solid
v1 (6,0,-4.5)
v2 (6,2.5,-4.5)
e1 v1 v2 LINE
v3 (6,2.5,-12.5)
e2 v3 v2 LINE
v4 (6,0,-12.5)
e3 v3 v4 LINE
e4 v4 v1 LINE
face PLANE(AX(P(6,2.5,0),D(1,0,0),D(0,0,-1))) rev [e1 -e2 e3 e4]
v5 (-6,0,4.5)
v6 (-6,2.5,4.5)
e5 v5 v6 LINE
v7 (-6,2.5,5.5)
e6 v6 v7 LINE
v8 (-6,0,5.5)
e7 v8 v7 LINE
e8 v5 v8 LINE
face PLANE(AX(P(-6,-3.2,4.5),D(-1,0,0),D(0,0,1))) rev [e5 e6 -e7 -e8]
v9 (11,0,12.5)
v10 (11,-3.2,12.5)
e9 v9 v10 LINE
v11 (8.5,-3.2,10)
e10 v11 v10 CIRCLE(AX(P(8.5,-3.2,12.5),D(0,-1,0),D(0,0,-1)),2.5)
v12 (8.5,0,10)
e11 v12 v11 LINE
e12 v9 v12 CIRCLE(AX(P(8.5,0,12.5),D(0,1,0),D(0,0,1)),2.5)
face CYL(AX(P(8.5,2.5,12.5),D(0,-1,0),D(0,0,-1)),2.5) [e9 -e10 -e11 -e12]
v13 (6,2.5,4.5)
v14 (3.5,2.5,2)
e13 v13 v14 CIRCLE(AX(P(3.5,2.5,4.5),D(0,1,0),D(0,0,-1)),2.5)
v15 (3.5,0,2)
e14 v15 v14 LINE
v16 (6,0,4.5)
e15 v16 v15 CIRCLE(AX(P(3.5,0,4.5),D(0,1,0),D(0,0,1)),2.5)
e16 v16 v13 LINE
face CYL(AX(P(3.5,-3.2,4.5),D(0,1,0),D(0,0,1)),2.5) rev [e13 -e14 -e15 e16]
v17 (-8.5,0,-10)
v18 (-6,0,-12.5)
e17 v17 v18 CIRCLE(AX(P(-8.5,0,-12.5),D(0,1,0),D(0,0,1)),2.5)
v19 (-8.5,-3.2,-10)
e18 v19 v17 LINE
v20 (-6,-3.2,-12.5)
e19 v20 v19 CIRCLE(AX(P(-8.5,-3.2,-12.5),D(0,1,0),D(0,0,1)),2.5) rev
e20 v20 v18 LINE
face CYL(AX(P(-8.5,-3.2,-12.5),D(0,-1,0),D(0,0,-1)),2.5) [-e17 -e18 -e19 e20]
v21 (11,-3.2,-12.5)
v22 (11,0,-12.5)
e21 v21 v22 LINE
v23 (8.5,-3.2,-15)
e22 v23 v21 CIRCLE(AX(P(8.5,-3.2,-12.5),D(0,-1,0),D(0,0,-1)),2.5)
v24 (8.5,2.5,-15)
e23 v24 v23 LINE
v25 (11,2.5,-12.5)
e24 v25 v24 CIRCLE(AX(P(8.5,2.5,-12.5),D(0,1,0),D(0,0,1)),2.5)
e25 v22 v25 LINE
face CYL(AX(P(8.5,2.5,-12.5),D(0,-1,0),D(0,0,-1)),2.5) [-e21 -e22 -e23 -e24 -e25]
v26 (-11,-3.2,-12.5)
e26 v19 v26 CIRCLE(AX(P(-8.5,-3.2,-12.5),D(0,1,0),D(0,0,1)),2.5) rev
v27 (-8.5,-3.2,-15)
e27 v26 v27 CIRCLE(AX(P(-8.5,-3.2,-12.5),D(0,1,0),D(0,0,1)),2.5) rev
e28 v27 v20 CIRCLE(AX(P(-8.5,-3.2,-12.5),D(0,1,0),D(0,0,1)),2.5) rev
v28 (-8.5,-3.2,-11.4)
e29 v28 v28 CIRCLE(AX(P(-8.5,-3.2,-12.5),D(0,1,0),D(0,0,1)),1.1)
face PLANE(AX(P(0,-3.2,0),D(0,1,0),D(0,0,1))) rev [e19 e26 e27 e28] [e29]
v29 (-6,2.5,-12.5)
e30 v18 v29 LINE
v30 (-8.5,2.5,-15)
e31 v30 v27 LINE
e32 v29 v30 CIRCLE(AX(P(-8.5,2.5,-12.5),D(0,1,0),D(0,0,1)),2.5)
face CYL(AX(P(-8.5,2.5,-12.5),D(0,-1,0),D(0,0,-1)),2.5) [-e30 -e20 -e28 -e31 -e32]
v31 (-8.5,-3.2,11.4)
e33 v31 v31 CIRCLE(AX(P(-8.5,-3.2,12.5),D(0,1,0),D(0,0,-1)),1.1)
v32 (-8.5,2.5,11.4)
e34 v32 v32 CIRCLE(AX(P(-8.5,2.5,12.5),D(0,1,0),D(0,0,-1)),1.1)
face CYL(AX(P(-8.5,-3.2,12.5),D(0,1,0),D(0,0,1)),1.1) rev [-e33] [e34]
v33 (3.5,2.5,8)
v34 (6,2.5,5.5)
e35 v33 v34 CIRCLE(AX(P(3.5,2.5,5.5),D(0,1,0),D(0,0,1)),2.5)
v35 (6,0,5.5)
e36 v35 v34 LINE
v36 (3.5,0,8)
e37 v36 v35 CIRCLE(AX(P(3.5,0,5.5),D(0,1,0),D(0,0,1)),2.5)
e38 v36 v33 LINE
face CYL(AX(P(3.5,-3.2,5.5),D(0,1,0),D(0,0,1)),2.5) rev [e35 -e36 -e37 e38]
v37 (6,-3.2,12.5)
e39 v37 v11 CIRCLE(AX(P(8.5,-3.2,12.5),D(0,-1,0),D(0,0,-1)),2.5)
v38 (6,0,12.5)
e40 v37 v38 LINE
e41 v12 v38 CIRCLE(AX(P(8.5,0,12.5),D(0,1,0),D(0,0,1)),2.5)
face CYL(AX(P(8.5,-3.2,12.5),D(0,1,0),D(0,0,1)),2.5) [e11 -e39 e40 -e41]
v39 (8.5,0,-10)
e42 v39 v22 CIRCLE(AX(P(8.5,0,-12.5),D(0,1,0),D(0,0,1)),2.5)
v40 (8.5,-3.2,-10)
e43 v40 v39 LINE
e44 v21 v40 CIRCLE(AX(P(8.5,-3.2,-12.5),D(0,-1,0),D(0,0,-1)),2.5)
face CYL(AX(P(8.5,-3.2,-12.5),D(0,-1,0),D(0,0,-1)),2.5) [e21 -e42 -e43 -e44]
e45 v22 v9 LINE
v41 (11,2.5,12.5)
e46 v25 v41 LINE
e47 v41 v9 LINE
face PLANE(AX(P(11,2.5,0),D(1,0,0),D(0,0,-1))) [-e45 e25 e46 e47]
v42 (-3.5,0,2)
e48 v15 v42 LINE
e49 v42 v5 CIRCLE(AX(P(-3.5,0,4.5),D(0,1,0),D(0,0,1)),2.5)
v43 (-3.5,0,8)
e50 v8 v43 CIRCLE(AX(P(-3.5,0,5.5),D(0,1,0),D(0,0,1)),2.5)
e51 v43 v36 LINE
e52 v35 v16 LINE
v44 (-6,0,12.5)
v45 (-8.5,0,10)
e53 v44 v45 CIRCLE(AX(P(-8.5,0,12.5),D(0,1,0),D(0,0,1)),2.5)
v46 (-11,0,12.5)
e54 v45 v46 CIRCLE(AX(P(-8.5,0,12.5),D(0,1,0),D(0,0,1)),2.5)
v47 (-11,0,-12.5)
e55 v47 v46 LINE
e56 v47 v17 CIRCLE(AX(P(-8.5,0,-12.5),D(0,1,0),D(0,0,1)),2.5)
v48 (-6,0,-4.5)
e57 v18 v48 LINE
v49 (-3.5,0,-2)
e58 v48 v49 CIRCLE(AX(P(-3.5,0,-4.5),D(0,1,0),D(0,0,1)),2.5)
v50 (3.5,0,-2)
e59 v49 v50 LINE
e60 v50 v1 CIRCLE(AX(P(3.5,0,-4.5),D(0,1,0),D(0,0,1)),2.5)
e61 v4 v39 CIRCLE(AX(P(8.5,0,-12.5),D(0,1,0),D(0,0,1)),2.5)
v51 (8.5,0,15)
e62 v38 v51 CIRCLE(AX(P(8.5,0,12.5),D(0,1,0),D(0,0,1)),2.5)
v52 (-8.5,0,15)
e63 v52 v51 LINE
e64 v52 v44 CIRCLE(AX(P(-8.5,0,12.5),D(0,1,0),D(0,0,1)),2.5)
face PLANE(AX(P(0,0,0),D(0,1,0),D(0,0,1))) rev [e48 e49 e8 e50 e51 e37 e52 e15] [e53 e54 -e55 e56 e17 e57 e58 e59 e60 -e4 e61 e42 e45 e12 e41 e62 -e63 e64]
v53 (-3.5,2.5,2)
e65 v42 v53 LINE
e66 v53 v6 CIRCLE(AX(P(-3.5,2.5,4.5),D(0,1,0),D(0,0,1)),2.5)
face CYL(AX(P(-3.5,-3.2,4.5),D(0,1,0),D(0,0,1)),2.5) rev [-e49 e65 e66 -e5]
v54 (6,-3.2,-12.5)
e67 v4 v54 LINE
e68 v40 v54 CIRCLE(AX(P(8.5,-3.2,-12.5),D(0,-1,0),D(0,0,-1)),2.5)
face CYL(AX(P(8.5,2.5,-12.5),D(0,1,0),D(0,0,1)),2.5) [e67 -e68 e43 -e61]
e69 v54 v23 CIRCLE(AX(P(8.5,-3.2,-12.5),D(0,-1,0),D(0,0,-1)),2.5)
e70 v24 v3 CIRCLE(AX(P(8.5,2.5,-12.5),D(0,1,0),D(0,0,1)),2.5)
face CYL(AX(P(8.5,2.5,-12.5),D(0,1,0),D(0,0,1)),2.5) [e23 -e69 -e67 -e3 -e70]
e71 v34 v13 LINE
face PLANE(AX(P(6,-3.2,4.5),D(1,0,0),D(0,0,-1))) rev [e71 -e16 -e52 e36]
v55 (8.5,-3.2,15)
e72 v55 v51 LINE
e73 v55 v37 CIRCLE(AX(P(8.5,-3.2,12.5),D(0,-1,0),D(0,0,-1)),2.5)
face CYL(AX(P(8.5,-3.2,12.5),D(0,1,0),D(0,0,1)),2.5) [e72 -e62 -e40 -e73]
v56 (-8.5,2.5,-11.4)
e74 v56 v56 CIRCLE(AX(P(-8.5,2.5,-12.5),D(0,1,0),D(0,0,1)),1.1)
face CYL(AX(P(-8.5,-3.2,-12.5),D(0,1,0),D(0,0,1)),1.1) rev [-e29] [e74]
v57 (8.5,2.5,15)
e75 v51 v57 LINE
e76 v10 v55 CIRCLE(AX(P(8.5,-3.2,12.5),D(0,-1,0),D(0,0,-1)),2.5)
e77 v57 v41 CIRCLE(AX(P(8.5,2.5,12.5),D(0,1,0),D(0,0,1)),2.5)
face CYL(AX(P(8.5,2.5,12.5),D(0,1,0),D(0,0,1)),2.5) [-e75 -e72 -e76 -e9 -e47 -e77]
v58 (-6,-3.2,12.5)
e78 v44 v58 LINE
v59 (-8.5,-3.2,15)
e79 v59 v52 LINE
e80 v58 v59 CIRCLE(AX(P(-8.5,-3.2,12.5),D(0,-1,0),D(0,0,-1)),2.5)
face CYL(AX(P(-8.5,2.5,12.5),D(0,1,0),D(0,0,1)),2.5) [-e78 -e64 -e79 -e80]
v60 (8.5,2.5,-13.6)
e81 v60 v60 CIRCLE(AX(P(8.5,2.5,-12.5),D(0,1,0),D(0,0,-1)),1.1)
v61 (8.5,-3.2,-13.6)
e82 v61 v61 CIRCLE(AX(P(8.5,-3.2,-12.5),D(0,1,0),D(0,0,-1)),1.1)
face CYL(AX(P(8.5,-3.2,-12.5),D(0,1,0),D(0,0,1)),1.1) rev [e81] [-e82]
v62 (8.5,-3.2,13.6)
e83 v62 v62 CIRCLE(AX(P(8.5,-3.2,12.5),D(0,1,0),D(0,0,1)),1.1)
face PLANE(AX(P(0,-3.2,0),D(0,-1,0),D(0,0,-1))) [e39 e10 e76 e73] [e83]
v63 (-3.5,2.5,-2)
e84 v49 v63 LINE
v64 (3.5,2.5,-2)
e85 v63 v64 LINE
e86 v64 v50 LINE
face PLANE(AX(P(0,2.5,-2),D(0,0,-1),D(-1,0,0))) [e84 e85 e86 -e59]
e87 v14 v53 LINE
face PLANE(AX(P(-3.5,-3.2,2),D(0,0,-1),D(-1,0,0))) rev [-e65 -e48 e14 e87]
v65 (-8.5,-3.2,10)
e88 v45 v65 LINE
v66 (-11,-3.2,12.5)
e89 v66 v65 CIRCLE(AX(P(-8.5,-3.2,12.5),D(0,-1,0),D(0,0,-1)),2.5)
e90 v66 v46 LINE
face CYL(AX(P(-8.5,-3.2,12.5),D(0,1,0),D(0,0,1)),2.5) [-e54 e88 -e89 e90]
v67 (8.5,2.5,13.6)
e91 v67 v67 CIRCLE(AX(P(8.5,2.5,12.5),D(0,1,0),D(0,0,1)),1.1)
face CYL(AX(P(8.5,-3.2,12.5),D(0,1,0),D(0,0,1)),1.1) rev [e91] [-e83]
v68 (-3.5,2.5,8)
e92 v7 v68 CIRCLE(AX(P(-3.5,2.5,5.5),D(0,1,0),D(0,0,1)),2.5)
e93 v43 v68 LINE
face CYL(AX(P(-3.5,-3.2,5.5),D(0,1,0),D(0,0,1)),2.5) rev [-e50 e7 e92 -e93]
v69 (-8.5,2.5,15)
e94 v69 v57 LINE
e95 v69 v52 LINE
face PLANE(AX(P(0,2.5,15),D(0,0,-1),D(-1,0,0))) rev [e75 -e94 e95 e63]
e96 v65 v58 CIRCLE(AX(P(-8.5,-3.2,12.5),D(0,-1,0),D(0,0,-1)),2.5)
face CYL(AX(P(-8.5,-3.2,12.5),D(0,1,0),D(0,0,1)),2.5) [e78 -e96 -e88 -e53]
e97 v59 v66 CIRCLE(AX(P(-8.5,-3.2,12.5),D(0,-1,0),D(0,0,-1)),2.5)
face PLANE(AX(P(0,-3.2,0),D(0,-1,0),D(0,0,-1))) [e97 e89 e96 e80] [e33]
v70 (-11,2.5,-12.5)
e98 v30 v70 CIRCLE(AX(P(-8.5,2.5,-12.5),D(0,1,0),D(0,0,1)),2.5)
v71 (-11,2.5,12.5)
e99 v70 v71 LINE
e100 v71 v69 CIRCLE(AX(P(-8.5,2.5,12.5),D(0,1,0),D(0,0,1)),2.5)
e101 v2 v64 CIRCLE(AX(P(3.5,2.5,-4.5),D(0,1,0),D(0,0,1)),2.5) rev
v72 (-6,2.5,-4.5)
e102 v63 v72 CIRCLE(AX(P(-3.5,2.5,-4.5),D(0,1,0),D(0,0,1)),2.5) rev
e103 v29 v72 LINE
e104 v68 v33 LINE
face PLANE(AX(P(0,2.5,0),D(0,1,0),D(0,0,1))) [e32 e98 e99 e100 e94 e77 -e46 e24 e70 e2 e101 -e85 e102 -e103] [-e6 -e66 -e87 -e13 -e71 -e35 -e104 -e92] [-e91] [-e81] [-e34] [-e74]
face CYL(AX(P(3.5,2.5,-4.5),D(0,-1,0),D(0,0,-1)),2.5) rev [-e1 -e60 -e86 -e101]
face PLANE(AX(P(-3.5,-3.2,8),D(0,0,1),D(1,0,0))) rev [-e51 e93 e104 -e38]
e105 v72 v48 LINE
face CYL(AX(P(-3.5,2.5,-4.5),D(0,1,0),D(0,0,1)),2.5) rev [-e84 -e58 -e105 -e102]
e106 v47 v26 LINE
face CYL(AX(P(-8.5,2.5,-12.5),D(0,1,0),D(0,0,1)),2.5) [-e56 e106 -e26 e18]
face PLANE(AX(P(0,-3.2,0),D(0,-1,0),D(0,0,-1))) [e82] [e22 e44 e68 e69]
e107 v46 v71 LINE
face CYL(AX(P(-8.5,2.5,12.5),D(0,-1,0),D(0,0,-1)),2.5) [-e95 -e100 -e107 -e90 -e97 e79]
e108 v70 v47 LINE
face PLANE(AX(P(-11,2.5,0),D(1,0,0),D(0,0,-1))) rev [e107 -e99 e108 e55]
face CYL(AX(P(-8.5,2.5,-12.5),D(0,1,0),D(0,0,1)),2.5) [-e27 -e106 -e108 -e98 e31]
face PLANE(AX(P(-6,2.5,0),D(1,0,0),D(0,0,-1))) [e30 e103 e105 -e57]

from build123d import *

# Parameters (mm, degrees)
SKETCH1_W           = 12
SKETCH1_H           = 12
SKETCH1_W_2         = 5
SKETCH1_H_2         = 5
BOSS_EXTRUDE1_DEPTH = 2.5
SKETCH2_W           = 5
SKETCH2_H           = 5
BOSS_EXTRUDE2_DEPTH = 3.2
SKETCH3_R           = 1.1
CUT_EXTRUDE1_DEPTH  = 20.454819454
FILLET1_R           = 2.5
CUT_EXTRUDE2_DEPTH  = 20.454819454


with BuildPart() as part:
    # Sketch1 → Boss-Extrude1 (new body)
    with BuildSketch(Plane(origin=(0, 0, 0), x_dir=(1, 0, 0), z_dir=(0, 1, 0))):
        Polygon((-6, -10), (-6, 2), (-6, 10), (-11, 10), (-11, -10), align=None)
        with Locations((0, -4)):
            Rectangle(SKETCH1_W, SKETCH1_H)
        Polygon((6, 10), (6, 2), (6, -10), (11, -10), (11, 10), align=None)
        with Locations((8.5, 12.5)):
            Rectangle(SKETCH1_W_2, SKETCH1_H_2)
        with Locations((-8.5, 12.5)):
            Rectangle(SKETCH1_W_2, SKETCH1_H_2)
        Polygon((11, -10), (11, -15), (-11, -15), (-11, -10), (-6, -10), (6, -10), align=None)
    extrude(amount=BOSS_EXTRUDE1_DEPTH)

    # Sketch2 → Boss-Extrude2 (add)
    with BuildSketch(Plane.XZ):
        with Locations((-8.5, -12.5)):
            Rectangle(SKETCH2_W, SKETCH2_H)
        with Locations((-8.5, 12.5)):
            Rectangle(SKETCH2_W, SKETCH2_H)
        with Locations((8.5, -12.5)):
            Rectangle(SKETCH2_W, SKETCH2_H)
        with Locations((8.5, 12.5)):
            Rectangle(SKETCH2_W, SKETCH2_H)
    extrude(amount=BOSS_EXTRUDE2_DEPTH)

    # Sketch3 → Cut-Extrude1 (cut, through all)
    with BuildSketch(Plane(origin=(0, 2.5, 0), x_dir=(1, 0, 0), z_dir=(0, 1, 0))):
        with Locations(Location((-8.5, 12.5, 0), (0, 0, 270))):
            Circle(SKETCH3_R)
        with Locations(Location((-8.5, -12.5, 0), (0, 0, 90))):
            Circle(SKETCH3_R)
        with Locations(Location((8.5, -12.5, 0), (0, 0, 270))):
            Circle(SKETCH3_R)
        with Locations(Location((8.5, 12.5, 0), (0, 0, 90))):
            Circle(SKETCH3_R)
    extrude(amount=-CUT_EXTRUDE1_DEPTH, mode=Mode.SUBTRACT)

    # Fillet1
    fillet1_edges = [part.edges().sort_by_distance(p)[0] for p in [
        (-11, -1.6, -10),
        (6, -1.6, -10),
        (6, -1.6, 10),
        (11, -1.6, -10),
        (-6, -1.6, -10),
        (-11, -1.6, 10),
        (-6, -1.6, 10),
        (11, -1.6, 10),
        (11, -0.35, 15),
        (-6, -1.6, 15),
        (6, -1.6, 15),
        (-11, -0.35, 15),
        (-11, -0.35, -15),
        (-6, -0.35, -15),
        (11, -0.35, -15),
        (6, -0.35, -15),
        (6, 1.25, -2),
        (-6, 1.25, -2),
    ]]
    fillet(fillet1_edges, radius=FILLET1_R - 0.0001)  # a hair under: the kernel refuses the full size

    # Sketch4 → Cut-Extrude2 (cut, through all)
    with BuildSketch(Plane(origin=(0, 2.5, 0), x_dir=(1, 0, 0), z_dir=(0, 1, 0))):
        with BuildLine():
            Line((-3.5, -2), (3.5, -2))
            ThreePointArc((3.5, -2), (5.267766953, -2.732233047), (6, -4.5))
            Line((6, -4.5), (6, -5.5))
            ThreePointArc((6, -5.5), (5.267766953, -7.267766953), (3.5, -8))
            Line((3.5, -8), (-3.5, -8))
            ThreePointArc((-3.5, -8), (-5.267766953, -7.267766953), (-6, -5.5))
            Line((-6, -5.5), (-6, -4.5))
            ThreePointArc((-6, -4.5), (-5.267766953, -2.732233047), (-3.5, -2))
        make_face()
    extrude(amount=-CUT_EXTRUDE2_DEPTH, mode=Mode.SUBTRACT)


solid = part.part
